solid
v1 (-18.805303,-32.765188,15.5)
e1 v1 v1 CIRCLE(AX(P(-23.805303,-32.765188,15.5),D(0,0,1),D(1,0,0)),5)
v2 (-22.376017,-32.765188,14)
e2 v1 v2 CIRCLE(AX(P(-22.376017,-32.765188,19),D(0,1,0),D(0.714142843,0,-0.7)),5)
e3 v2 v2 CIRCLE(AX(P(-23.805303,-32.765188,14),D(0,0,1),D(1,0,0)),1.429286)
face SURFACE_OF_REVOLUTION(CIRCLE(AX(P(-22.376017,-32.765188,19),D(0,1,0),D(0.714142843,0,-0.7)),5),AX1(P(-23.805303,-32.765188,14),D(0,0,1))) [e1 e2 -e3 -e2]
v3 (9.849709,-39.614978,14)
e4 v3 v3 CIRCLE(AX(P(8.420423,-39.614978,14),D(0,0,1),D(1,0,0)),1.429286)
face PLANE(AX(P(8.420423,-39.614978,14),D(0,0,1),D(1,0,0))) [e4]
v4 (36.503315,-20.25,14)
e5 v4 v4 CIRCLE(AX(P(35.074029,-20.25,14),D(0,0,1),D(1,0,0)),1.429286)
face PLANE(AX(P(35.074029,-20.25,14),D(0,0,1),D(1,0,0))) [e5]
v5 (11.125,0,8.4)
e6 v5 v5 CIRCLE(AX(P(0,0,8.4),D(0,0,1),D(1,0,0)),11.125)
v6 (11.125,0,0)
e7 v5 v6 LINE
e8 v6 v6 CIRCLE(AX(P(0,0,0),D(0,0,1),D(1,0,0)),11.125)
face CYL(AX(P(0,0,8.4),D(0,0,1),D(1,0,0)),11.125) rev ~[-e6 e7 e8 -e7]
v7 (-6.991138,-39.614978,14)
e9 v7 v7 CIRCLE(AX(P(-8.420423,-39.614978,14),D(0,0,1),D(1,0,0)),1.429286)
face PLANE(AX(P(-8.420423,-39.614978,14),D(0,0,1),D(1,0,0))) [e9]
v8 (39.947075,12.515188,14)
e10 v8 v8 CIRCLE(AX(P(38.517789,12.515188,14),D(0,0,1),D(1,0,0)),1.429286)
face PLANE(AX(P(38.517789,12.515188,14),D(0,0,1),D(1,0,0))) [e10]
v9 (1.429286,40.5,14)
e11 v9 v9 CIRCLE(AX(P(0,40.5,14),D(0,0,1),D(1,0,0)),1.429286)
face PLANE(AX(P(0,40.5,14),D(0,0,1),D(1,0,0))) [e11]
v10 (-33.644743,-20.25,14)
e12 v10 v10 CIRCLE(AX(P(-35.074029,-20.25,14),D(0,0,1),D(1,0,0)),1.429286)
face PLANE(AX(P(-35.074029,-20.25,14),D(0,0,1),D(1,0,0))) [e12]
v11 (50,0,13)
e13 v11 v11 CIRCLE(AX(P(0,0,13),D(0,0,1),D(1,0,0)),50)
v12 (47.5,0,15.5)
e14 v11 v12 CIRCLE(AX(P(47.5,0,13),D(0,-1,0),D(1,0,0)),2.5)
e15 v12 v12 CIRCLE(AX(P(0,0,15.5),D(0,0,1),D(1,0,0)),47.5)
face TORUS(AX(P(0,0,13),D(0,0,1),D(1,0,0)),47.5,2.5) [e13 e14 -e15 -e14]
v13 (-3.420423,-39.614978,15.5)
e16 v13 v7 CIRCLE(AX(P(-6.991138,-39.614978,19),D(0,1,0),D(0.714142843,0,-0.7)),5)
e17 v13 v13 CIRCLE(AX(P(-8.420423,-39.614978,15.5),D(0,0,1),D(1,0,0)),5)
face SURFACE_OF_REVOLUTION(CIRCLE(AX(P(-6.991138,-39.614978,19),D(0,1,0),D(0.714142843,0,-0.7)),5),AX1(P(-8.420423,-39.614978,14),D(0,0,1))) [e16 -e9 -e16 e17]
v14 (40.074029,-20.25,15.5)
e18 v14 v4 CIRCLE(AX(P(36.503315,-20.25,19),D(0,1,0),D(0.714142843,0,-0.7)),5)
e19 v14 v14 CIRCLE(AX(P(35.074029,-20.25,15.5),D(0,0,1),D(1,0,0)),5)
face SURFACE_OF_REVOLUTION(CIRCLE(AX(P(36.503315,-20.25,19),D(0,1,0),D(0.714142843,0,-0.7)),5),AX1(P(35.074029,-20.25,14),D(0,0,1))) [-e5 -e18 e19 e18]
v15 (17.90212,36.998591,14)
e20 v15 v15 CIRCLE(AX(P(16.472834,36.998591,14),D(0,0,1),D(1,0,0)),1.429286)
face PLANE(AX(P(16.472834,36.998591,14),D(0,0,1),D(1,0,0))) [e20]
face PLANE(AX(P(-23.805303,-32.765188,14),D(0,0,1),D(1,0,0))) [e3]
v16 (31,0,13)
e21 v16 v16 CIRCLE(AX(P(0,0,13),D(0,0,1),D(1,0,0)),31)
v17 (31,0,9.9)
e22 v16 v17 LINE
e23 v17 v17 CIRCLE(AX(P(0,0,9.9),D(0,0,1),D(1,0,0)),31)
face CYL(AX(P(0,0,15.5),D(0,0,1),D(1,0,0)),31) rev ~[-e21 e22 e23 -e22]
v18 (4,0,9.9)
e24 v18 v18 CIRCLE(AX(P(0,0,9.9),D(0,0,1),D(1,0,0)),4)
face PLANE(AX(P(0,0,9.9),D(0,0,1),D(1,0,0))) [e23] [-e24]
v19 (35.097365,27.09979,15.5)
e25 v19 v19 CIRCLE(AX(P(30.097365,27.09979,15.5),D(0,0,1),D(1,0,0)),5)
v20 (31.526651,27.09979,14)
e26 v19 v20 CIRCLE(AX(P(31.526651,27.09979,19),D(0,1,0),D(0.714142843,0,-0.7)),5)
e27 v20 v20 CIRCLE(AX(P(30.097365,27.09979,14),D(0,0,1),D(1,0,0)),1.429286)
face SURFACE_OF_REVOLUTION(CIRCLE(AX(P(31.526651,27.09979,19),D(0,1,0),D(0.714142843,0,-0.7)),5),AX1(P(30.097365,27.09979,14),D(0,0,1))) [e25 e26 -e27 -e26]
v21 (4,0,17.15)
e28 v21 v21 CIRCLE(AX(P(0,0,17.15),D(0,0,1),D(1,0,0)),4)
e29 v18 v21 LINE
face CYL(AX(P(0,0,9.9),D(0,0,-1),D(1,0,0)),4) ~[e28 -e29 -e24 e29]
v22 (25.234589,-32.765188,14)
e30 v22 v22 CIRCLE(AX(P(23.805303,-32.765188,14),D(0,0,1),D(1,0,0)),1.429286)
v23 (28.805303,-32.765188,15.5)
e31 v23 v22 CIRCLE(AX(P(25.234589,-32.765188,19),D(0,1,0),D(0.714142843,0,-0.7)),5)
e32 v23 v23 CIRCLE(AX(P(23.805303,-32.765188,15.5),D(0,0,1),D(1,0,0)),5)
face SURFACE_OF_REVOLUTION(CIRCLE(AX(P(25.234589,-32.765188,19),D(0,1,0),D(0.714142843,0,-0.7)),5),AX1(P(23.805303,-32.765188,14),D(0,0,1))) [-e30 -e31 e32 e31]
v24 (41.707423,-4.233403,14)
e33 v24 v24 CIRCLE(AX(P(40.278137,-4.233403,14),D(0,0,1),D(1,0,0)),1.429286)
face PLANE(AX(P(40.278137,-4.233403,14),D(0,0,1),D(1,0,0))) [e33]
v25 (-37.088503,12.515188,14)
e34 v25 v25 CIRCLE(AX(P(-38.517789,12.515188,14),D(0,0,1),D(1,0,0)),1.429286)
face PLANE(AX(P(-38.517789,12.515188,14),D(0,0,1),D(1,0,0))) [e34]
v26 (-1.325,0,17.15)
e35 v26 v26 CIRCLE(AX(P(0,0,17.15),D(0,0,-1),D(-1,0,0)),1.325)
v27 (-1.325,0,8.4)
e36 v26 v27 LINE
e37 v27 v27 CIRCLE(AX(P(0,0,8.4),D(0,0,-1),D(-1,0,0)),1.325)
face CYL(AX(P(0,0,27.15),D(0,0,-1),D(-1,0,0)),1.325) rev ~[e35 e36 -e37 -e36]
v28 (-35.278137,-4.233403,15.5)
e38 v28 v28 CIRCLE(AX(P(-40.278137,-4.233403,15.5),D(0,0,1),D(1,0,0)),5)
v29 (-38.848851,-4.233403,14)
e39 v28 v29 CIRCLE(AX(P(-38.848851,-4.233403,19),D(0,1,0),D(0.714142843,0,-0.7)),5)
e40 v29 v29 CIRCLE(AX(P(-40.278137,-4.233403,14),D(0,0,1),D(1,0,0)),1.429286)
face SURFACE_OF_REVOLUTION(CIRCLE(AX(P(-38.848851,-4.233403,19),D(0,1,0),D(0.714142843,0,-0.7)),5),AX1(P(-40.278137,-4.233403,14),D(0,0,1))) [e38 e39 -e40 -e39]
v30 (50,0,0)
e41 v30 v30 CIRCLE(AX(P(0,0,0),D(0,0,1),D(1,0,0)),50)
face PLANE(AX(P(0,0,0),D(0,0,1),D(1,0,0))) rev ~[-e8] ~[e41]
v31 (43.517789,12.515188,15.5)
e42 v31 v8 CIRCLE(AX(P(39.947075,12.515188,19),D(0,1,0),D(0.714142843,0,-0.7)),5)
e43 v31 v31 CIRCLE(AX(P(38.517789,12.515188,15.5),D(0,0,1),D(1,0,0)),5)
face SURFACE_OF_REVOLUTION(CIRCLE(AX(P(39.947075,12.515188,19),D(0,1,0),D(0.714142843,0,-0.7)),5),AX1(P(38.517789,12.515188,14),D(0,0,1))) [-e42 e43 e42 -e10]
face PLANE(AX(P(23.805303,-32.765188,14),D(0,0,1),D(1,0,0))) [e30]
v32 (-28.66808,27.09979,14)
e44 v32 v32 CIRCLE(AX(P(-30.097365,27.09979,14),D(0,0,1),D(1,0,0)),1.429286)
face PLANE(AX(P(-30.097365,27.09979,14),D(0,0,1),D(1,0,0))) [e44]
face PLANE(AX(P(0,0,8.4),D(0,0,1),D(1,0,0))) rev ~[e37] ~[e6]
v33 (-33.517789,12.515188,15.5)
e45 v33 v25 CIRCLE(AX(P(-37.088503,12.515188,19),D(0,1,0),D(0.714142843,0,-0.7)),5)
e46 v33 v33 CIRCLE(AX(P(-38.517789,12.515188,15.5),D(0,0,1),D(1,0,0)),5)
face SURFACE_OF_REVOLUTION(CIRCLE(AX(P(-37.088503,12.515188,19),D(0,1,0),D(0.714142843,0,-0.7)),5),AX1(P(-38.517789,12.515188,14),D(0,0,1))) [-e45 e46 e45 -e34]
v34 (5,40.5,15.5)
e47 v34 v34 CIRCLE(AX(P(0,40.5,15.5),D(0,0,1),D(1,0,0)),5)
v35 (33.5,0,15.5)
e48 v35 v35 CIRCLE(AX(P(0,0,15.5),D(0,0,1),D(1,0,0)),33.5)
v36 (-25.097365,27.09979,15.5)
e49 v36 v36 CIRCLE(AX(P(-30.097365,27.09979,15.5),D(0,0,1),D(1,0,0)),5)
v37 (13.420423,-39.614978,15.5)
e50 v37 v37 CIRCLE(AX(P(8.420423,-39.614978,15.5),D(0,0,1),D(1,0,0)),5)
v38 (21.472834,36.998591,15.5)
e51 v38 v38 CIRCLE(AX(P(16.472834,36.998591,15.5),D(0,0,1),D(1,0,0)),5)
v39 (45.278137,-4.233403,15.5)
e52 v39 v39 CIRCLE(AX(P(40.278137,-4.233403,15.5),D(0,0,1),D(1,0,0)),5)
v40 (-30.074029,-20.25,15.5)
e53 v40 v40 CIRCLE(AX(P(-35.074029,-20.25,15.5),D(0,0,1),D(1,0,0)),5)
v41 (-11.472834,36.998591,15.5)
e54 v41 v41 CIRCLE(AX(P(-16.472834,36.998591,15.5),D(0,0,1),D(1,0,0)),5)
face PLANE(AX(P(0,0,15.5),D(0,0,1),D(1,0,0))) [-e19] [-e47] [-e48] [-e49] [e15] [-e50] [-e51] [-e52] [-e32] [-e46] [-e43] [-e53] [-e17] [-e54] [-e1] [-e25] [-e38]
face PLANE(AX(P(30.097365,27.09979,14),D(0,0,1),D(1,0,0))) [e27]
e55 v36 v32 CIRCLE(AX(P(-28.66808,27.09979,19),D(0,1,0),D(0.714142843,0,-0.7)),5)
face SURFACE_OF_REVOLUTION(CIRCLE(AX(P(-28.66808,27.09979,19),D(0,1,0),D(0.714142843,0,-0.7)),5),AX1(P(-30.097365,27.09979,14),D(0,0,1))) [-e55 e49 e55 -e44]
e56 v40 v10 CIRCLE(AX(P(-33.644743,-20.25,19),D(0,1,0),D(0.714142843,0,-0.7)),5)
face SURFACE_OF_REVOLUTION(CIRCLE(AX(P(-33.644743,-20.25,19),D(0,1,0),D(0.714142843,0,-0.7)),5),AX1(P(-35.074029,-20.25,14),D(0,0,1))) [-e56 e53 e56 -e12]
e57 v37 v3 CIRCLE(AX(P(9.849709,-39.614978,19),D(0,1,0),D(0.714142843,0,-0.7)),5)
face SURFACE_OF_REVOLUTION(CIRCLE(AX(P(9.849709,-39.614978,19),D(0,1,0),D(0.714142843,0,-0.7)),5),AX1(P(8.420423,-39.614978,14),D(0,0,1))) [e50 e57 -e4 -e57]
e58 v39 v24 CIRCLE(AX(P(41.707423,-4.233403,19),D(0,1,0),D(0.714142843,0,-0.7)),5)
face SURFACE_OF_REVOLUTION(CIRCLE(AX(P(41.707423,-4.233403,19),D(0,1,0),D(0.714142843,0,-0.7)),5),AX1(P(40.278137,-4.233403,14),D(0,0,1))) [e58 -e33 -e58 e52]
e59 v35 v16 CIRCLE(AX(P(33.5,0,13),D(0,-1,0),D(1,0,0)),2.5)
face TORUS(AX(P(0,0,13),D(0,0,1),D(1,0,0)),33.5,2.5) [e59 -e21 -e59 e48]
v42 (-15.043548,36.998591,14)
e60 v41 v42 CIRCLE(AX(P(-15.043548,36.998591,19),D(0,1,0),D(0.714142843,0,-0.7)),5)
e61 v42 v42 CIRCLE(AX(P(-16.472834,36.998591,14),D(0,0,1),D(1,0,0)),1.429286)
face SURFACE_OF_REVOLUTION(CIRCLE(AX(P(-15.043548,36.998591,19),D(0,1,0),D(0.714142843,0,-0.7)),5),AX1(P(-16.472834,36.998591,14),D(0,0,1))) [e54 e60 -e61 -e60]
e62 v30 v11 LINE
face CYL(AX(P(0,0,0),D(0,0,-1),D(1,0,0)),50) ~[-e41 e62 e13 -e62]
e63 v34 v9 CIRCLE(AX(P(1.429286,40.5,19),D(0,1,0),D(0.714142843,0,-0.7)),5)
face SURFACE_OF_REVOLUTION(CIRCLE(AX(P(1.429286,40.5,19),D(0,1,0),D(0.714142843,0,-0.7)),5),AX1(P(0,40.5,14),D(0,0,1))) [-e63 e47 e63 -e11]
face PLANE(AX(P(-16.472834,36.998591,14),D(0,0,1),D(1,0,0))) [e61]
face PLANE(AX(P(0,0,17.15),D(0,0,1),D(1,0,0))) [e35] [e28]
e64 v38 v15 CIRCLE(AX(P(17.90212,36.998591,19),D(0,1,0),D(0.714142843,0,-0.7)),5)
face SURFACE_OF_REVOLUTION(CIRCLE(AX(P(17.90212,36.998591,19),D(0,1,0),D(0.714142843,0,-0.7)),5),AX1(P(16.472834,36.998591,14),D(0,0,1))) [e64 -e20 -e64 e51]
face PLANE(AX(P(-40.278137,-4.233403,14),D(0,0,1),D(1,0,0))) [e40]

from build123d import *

# Parameters (mm, degrees)
F0_R      = 50
F1_DEPTH  = 15.5
F2_R      = 31
F3_DEPTH  = 7.1
F4_R      = 11.125
F5_DEPTH  = 9
F6_R      = 2.5
F7_R      = 5
F8_DEPTH  = 1.5
F10_R     = 31.0625
F11_DEPTH = 1.5
F12_R     = 4
F13_DEPTH = 7.25
F15_D     = 2.65
F15_DEPTH = 10
F15_TIP   = 0.7961403202


# Not quite as in the source:
# - a fillet or chamfer that OpenCascade refuses, or shapes differently, is made with other operations: its cross-section is extruded or revolved along the edge and cut away or added


with BuildPart() as f1:
    # F0 (on Top) → F1 (new body)
    with BuildSketch(Plane.XY):
        Circle(F0_R)
    extrude(amount=F1_DEPTH)

    # F2 (on face) → F3 (cut)
    with BuildSketch(Plane.XY.offset(15.5)):
        Circle(F2_R)
    extrude(amount=-F3_DEPTH, mode=Mode.SUBTRACT)

    # F4 (on face) → F5 (cut)
    with BuildSketch(Plane.XY.offset(8.4)):
        Circle(F4_R)
    extrude(amount=-F5_DEPTH, mode=Mode.SUBTRACT)

    # F6
    f6_edges = [f1.edges().sort_by_distance(p)[0] for p in [
        (-50, 0, 15.5),
        (-31, 0, 15.5),
    ]]
    fillet(f6_edges, radius=F6_R)

    # F7 (on face) → F8 (cut)
    with BuildSketch(Plane.XY.offset(15.5)):
        with Locations((0, 40.5)):
            Circle(F7_R)
        with Locations((-16.4728340446, 36.9985910345)):
            Circle(F7_R)
        with Locations((-30.0973654318, 27.0997895575)):
            Circle(F7_R)
        with Locations((-38.51778891, 12.5151882722)):
            Circle(F7_R)
        with Locations((-40.2781367624, -4.2334027623)):
            Circle(F7_R)
        with Locations((-35.0740288533, -20.25)):
            Circle(F7_R)
        with Locations((-23.8053027178, -32.7651882722)):
            Circle(F7_R)
        with Locations((-8.4204234781, -39.6149778297)):
            Circle(F7_R)
        with Locations((8.4204234781, -39.6149778297)):
            Circle(F7_R)
        with Locations((23.8053027178, -32.7651882722)):
            Circle(F7_R)
        with Locations((35.0740288533, -20.25)):
            Circle(F7_R)
        with Locations((40.2781367624, -4.2334027623)):
            Circle(F7_R)
        with Locations((38.51778891, 12.5151882722)):
            Circle(F7_R)
        with Locations((30.0973654318, 27.0997895575)):
            Circle(F7_R)
        with Locations((16.4728340446, 36.9985910345)):
            Circle(F7_R)
    extrude(amount=-F8_DEPTH, mode=Mode.SUBTRACT)

    # F9: fillet of radius 5 on 15 edges, made by hand

    # F9_s1 → F9_t2 (revolve)
    with BuildSketch(Plane.XZ.offset(-40.5)):
        with BuildLine():
            ThreePointArc((5, 15.5), (3.3657774588, 14.3902277714), (1.4292857857, 14))
            Line((1.4292857857, 14), (5, 14))
            Line((5, 14), (5, 15.5))
        make_face()
    revolve(axis=Axis((0, 40.5, 14), (0, 0, 1)))

    # F9_s3 → F9_t4 (revolve)
    with BuildSketch(Plane.XZ.offset(-36.9985910345)):
        with BuildLine():
            ThreePointArc((-11.4728340446, 15.5), (-13.1070565857, 14.3902277714), (-15.0435482588, 14))
            Line((-15.0435482588, 14), (-11.4728340446, 14))
            Line((-11.4728340446, 14), (-11.4728340446, 15.5))
        make_face()
    revolve(axis=Axis((-16.4728340446, 36.9985910345, 14), (0, 0, 1)))

    # F9_s5 → F9_t6 (revolve)
    with BuildSketch(Plane.XZ.offset(-27.0997895575)):
        with BuildLine():
            ThreePointArc((-25.0973654318, 15.5), (-26.731587973, 14.3902277714), (-28.6680796461, 14))
            Line((-28.6680796461, 14), (-25.0973654318, 14))
            Line((-25.0973654318, 14), (-25.0973654318, 15.5))
        make_face()
    revolve(axis=Axis((-30.0973654318, 27.0997895575, 14), (0, 0, 1)))

    # F9_s7 → F9_t8 (revolve)
    with BuildSketch(Plane.XZ.offset(-12.5151882722)):
        with BuildLine():
            ThreePointArc((-33.51778891, 15.5), (-35.1520114511, 14.3902277714), (-37.0885031242, 14))
            Line((-37.0885031242, 14), (-33.51778891, 14))
            Line((-33.51778891, 14), (-33.51778891, 15.5))
        make_face()
    revolve(axis=Axis((-38.51778891, 12.5151882722, 14), (0, 0, 1)))

    # F9_s9 → F9_t10 (revolve)
    with BuildSketch(Plane.XZ.offset(4.2334027623)):
        with BuildLine():
            ThreePointArc((-35.2781367624, 15.5), (-36.9123593036, 14.3902277714), (-38.8488509767, 14))
            Line((-38.8488509767, 14), (-35.2781367624, 14))
            Line((-35.2781367624, 14), (-35.2781367624, 15.5))
        make_face()
    revolve(axis=Axis((-40.2781367624, -4.2334027623, 14), (0, 0, 1)))

    # F9_s11 → F9_t12 (revolve)
    with BuildSketch(Plane.XZ.offset(20.25)):
        with BuildLine():
            ThreePointArc((-30.0740288533, 15.5), (-31.7082513944, 14.3902277714), (-33.6447430675, 14))
            Line((-33.6447430675, 14), (-30.0740288533, 14))
            Line((-30.0740288533, 14), (-30.0740288533, 15.5))
        make_face()
    revolve(axis=Axis((-35.0740288533, -20.25, 14), (0, 0, 1)))

    # F9_s13 → F9_t14 (revolve)
    with BuildSketch(Plane.XZ.offset(32.7651882722)):
        with BuildLine():
            ThreePointArc((-18.8053027178, 15.5), (-20.439525259, 14.3902277714), (-22.3760169321, 14))
            Line((-22.3760169321, 14), (-18.8053027178, 14))
            Line((-18.8053027178, 14), (-18.8053027178, 15.5))
        make_face()
    revolve(axis=Axis((-23.8053027178, -32.7651882722, 14), (0, 0, 1)))

    # F9_s15 → F9_t16 (revolve)
    with BuildSketch(Plane.XZ.offset(39.6149778297)):
        with BuildLine():
            ThreePointArc((-3.4204234781, 15.5), (-5.0546460193, 14.3902277714), (-6.9911376924, 14))
            Line((-6.9911376924, 14), (-3.4204234781, 14))
            Line((-3.4204234781, 14), (-3.4204234781, 15.5))
        make_face()
    revolve(axis=Axis((-8.4204234781, -39.6149778297, 14), (0, 0, 1)))

    # F9_s17 → F9_t18 (revolve)
    with BuildSketch(Plane.XZ.offset(39.6149778297)):
        with BuildLine():
            ThreePointArc((13.4204234781, 15.5), (11.786200937, 14.3902277714), (9.8497092638, 14))
            Line((9.8497092638, 14), (13.4204234781, 14))
            Line((13.4204234781, 14), (13.4204234781, 15.5))
        make_face()
    revolve(axis=Axis((8.4204234781, -39.6149778297, 14), (0, 0, 1)))

    # F9_s19 → F9_t20 (revolve)
    with BuildSketch(Plane.XZ.offset(32.7651882722)):
        with BuildLine():
            ThreePointArc((28.8053027178, 15.5), (27.1710801767, 14.3902277714), (25.2345885036, 14))
            Line((25.2345885036, 14), (28.8053027178, 14))
            Line((28.8053027178, 14), (28.8053027178, 15.5))
        make_face()
    revolve(axis=Axis((23.8053027178, -32.7651882722, 14), (0, 0, 1)))

    # F9_s21 → F9_t22 (revolve)
    with BuildSketch(Plane.XZ.offset(20.25)):
        with BuildLine():
            ThreePointArc((40.0740288533, 15.5), (38.4398063121, 14.3902277714), (36.503314639, 14))
            Line((36.503314639, 14), (40.0740288533, 14))
            Line((40.0740288533, 14), (40.0740288533, 15.5))
        make_face()
    revolve(axis=Axis((35.0740288533, -20.25, 14), (0, 0, 1)))

    # F9_s23 → F9_t24 (revolve)
    with BuildSketch(Plane.XZ.offset(4.2334027623)):
        with BuildLine():
            ThreePointArc((45.2781367624, 15.5), (43.6439142212, 14.3902277714), (41.7074225481, 14))
            Line((41.7074225481, 14), (45.2781367624, 14))
            Line((45.2781367624, 14), (45.2781367624, 15.5))
        make_face()
    revolve(axis=Axis((40.2781367624, -4.2334027623, 14), (0, 0, 1)))

    # F9_s25 → F9_t26 (revolve)
    with BuildSketch(Plane.XZ.offset(-12.5151882722)):
        with BuildLine():
            ThreePointArc((43.51778891, 15.5), (41.8835663688, 14.3902277714), (39.9470746957, 14))
            Line((39.9470746957, 14), (43.51778891, 14))
            Line((43.51778891, 14), (43.51778891, 15.5))
        make_face()
    revolve(axis=Axis((38.51778891, 12.5151882722, 14), (0, 0, 1)))

    # F9_s27 → F9_t28 (revolve)
    with BuildSketch(Plane.XZ.offset(-27.0997895575)):
        with BuildLine():
            ThreePointArc((35.0973654318, 15.5), (33.4631428907, 14.3902277714), (31.5266512176, 14))
            Line((31.5266512176, 14), (35.0973654318, 14))
            Line((35.0973654318, 14), (35.0973654318, 15.5))
        make_face()
    revolve(axis=Axis((30.0973654318, 27.0997895575, 14), (0, 0, 1)))

    # F9_s29 → F9_t30 (revolve)
    with BuildSketch(Plane.XZ.offset(-36.9985910345)):
        with BuildLine():
            ThreePointArc((21.4728340446, 15.5), (19.8386115034, 14.3902277714), (17.9021198303, 14))
            Line((17.9021198303, 14), (21.4728340446, 14))
            Line((21.4728340446, 14), (21.4728340446, 15.5))
        make_face()
    revolve(axis=Axis((16.4728340446, 36.9985910345, 14), (0, 0, 1)))

    # F10 (on face) → F11 (join)
    with BuildSketch(Plane.XY.offset(8.4)):
        Circle(F10_R)
    extrude(amount=F11_DEPTH)

    # F12 (on face) → F13 (join)
    with BuildSketch(Plane.XY.offset(9.9)):
        Circle(F12_R)
    extrude(amount=F13_DEPTH)

    # F15
    with Locations(Plane.XY.offset(17.15)):
        with Locations((0, 0)):
            Hole(F15_D / 2, depth=F15_DEPTH)
            with Locations((0, 0, -(F15_DEPTH + F15_TIP / 2))):  # 118° drill point
                Cone(0, F15_D / 2, F15_TIP, mode=Mode.SUBTRACT)


solid = f1.part
